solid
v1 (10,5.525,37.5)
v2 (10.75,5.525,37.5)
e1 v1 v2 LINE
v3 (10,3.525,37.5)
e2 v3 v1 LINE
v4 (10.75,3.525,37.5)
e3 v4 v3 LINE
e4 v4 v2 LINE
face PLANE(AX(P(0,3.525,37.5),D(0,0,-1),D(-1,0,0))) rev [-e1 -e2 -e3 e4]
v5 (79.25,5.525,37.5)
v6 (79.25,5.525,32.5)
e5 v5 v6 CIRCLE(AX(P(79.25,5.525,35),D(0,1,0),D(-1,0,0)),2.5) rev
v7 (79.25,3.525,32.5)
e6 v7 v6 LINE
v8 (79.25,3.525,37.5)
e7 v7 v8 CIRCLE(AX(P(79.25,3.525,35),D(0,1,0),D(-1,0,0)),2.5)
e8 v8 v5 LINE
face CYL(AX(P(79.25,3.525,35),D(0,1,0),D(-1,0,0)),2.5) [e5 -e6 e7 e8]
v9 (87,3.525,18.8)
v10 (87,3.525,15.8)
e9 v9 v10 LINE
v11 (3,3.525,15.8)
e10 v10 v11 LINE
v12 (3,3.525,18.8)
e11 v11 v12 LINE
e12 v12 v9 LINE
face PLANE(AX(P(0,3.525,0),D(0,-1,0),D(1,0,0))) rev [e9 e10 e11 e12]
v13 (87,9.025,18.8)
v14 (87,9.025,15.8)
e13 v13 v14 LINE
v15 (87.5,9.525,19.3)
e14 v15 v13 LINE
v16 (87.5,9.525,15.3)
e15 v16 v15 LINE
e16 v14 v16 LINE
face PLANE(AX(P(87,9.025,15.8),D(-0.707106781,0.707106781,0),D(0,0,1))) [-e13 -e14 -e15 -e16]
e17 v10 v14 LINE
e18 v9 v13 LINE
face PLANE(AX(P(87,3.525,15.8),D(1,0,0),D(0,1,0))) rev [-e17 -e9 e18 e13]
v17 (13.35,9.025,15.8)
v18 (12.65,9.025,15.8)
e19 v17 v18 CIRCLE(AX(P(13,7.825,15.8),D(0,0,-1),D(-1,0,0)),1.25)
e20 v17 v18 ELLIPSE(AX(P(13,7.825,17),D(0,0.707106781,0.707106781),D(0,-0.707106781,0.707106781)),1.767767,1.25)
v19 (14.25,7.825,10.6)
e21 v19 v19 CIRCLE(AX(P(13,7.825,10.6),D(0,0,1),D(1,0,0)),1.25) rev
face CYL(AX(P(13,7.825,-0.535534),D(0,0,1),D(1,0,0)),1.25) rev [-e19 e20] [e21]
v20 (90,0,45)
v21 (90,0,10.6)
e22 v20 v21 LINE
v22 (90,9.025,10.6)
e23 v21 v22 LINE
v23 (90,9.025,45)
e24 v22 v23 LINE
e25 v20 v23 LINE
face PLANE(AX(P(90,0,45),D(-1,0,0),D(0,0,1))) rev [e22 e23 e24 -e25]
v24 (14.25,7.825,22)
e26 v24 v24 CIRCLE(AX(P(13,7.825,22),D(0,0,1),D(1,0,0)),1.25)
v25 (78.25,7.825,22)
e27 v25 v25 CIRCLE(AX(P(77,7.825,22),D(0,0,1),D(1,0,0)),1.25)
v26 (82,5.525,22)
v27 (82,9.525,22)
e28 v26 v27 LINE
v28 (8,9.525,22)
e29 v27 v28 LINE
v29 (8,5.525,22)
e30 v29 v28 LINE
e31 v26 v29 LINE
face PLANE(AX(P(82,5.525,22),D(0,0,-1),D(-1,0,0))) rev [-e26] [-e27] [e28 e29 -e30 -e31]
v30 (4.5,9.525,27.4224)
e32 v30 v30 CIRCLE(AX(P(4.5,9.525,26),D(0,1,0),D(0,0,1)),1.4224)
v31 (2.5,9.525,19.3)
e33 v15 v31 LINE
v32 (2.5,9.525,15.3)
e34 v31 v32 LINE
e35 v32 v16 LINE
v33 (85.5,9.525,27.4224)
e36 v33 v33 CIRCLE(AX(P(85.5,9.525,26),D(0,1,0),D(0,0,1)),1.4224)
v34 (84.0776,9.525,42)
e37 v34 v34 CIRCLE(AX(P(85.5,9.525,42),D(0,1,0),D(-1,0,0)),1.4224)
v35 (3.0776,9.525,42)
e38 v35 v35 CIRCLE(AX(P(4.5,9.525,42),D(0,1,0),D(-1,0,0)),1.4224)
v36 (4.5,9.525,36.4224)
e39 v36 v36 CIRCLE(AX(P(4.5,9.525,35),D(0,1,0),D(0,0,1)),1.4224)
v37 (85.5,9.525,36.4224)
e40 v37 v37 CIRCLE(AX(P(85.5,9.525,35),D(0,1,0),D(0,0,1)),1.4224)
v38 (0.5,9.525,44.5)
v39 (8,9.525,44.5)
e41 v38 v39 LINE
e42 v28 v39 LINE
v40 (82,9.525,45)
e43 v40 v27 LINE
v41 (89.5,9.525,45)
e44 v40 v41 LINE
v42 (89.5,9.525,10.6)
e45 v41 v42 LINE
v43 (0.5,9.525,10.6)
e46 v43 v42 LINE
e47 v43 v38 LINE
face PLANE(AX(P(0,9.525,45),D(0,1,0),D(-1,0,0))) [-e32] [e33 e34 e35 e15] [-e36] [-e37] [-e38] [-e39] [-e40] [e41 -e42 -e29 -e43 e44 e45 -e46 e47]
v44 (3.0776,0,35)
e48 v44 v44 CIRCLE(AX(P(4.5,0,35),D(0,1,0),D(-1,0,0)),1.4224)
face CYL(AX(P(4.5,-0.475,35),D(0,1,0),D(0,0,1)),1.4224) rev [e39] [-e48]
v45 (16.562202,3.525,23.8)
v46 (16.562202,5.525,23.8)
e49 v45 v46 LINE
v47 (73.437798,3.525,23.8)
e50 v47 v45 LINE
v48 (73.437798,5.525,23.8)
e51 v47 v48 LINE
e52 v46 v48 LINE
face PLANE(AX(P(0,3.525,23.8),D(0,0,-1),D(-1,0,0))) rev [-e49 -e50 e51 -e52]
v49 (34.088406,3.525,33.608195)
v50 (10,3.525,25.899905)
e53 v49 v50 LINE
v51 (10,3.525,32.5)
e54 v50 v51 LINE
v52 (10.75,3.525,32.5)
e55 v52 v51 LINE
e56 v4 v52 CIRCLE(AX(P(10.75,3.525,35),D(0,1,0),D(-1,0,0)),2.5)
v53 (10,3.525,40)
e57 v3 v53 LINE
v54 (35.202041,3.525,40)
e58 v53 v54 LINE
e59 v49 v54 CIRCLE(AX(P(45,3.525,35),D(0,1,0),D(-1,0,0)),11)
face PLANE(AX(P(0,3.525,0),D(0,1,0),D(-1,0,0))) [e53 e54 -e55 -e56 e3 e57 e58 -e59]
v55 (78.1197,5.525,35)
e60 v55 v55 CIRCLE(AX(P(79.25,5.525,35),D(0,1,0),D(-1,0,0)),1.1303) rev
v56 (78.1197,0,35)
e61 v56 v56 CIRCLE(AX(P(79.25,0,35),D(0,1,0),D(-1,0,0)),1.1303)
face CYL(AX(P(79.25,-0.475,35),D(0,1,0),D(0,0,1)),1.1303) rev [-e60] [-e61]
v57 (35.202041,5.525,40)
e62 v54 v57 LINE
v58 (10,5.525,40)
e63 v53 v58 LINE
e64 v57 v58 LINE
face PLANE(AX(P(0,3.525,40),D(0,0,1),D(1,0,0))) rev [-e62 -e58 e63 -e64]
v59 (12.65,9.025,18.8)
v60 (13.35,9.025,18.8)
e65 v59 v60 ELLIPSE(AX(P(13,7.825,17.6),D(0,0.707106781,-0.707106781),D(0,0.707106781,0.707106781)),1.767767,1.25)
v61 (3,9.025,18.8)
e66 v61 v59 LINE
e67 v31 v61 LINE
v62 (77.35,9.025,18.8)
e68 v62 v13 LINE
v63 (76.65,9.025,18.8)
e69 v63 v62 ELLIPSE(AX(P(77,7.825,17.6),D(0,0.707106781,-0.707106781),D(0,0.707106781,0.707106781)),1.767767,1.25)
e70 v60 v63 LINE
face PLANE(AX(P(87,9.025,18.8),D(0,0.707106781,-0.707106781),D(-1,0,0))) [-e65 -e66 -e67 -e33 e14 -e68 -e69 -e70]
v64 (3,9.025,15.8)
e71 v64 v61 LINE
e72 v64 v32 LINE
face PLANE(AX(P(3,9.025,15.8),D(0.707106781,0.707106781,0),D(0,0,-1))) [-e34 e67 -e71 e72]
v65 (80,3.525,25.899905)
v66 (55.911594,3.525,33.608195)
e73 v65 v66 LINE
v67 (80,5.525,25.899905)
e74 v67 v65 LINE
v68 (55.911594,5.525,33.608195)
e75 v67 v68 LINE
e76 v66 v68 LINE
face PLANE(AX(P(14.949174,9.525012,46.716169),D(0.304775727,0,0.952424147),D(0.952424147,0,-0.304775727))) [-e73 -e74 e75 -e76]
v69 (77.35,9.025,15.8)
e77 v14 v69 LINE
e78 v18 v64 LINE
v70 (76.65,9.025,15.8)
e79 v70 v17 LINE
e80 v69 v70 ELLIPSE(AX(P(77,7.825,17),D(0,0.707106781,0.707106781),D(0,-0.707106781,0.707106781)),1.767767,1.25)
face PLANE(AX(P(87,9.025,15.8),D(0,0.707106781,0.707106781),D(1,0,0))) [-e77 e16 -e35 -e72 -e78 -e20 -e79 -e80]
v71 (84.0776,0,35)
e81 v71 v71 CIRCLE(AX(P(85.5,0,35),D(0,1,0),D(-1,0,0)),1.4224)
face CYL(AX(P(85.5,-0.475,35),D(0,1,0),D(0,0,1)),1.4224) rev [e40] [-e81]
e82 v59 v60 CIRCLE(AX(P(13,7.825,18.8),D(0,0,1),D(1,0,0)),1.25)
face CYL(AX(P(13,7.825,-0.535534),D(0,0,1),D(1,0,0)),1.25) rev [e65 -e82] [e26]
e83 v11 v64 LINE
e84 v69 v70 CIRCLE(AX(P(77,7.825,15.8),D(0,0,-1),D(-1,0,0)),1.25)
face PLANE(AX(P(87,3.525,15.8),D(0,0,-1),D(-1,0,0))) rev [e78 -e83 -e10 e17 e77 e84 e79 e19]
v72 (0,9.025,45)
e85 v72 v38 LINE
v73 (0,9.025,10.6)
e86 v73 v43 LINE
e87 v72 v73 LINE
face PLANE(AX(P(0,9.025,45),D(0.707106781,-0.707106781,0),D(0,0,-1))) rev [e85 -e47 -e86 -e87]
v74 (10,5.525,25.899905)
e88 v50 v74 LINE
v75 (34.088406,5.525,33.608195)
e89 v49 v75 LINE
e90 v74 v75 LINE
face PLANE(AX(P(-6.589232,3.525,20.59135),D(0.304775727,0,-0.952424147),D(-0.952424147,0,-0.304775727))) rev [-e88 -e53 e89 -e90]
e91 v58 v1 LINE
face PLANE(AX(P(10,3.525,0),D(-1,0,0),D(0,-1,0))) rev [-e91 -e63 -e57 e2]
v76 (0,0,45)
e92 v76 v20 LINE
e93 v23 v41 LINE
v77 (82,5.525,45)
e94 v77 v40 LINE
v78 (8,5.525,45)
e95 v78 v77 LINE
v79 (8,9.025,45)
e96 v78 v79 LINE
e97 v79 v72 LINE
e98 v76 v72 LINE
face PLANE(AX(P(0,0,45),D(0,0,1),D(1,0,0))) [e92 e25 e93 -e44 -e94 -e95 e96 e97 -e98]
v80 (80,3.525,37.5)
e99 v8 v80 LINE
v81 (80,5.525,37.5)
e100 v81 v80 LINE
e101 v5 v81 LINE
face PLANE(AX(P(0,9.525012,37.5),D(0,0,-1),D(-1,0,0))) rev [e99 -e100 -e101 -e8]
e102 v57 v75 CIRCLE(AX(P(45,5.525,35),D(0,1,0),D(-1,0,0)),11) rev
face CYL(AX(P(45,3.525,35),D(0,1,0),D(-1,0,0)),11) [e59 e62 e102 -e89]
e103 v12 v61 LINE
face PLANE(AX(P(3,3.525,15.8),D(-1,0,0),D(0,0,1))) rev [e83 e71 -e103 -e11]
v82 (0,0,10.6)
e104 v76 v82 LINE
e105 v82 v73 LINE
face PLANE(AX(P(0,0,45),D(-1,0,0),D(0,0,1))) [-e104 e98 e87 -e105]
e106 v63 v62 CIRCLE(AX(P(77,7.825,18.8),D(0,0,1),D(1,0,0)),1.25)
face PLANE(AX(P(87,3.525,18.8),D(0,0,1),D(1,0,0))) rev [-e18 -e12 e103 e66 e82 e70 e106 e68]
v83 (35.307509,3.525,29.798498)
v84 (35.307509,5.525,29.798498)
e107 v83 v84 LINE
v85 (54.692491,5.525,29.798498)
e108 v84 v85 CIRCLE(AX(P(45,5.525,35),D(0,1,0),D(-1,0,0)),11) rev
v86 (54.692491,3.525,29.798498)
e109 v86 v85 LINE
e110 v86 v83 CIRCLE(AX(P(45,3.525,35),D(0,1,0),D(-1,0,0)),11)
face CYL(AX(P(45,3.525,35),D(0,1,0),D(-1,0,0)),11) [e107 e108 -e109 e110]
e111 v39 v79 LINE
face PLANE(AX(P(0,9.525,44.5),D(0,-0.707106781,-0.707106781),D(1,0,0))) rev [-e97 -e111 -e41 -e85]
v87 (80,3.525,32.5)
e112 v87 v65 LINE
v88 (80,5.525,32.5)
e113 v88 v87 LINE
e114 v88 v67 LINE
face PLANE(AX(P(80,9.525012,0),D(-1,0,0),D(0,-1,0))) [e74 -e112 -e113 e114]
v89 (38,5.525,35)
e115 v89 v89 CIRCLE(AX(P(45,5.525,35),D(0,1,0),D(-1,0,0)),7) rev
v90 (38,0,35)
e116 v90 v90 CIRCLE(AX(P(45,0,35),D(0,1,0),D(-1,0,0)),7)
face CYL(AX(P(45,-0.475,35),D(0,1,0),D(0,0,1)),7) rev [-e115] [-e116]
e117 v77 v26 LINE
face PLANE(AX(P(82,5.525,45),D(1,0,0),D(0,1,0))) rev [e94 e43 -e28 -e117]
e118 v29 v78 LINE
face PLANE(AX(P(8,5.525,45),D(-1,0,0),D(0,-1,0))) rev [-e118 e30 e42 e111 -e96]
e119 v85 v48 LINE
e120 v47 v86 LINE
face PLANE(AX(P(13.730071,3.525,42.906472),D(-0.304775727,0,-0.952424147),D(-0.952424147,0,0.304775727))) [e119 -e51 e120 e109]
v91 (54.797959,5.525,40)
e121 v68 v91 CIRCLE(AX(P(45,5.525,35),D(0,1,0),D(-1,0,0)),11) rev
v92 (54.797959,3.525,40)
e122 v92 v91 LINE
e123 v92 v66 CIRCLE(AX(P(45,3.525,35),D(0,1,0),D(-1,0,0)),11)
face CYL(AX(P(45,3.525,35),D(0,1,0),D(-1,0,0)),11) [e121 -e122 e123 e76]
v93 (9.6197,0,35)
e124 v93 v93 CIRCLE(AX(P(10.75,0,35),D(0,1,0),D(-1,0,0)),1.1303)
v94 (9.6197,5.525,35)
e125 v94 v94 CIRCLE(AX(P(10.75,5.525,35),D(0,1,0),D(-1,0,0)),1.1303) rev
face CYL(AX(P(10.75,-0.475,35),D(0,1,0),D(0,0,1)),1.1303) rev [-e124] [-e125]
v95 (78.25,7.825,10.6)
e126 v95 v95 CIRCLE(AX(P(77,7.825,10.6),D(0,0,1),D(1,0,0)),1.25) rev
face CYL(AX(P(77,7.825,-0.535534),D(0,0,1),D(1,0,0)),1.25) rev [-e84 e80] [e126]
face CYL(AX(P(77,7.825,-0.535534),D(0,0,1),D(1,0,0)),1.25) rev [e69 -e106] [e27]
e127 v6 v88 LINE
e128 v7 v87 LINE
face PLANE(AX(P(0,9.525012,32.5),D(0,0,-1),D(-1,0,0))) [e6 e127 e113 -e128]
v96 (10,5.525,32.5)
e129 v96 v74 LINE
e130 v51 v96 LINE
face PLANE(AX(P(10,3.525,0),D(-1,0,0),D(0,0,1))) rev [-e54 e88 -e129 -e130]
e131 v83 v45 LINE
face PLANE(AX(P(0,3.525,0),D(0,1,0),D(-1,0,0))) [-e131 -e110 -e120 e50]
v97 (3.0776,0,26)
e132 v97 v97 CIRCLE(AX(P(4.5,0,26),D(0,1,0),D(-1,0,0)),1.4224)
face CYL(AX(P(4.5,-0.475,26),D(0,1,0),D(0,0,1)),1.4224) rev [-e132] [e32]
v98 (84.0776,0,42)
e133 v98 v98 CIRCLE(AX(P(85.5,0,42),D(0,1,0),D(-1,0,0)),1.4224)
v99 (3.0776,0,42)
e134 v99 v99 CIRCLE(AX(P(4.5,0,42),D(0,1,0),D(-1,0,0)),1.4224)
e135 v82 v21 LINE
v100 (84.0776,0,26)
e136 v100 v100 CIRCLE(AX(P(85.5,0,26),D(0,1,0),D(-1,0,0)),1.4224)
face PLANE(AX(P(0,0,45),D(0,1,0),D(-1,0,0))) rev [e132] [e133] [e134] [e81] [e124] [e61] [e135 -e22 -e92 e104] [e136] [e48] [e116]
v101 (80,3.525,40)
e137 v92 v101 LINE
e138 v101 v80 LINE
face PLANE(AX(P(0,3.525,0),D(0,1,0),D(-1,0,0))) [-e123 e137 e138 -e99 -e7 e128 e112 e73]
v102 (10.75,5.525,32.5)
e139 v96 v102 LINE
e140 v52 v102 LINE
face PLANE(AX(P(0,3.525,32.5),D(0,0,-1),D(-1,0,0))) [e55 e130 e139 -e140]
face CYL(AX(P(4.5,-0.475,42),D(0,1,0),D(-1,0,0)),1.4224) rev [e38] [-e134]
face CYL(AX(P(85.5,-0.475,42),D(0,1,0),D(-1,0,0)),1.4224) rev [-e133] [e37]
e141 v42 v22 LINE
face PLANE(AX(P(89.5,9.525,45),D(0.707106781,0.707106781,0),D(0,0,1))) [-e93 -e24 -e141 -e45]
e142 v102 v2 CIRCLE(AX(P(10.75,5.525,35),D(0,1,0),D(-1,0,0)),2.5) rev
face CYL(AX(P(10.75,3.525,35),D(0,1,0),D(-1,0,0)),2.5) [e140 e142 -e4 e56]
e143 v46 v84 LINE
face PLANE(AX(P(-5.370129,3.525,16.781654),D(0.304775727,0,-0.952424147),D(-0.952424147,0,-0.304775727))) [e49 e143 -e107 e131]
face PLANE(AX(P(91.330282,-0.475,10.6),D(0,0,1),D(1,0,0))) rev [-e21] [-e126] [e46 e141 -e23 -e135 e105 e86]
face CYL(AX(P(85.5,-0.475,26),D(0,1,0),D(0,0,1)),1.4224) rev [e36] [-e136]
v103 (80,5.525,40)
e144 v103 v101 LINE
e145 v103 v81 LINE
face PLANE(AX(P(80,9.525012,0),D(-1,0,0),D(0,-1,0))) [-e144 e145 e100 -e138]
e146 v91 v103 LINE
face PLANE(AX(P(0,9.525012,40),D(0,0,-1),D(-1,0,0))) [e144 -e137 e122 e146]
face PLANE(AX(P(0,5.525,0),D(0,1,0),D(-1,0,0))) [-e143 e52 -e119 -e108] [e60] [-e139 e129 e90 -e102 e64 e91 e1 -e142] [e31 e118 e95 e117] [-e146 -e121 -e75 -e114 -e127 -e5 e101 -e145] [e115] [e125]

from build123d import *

# Parameters (mm, degrees)
SKETCH1_W               = 90
SKETCH1_H               = 9.525
SKETCH1_R               = 2
BOSS_EXTRUDE1_DEPTH     = 45
SKETCH2_R               = 7
CUT_EXTRUDE2_DEPTH      = 10
SKETCH3_R               = 1.4224
SKETCH3_R_2             = 7
SKETCH3_R_3             = 1.1303
CUT_EXTRUDE3_DEPTH      = 10
SKETCH4_W               = 84
SKETCH4_H               = 3
CUT_EXTRUDE4_DEPTH      = 6
CUT_EXTRUDE6_DEPTH      = 102.072872844
CUT_EXTRUDE6_DEPTH_BACK = 6
SKETCH7_W               = 90
SKETCH7_H               = 3
CUT_EXTRUDE7_DEPTH      = 10
SKETCH9_W               = 74
SKETCH9_H               = 23
CUT_EXTRUDE8_DEPTH      = 4
CUT_EXTRUDE9_REACH      = 95.379
SKETCH10_R              = 1.25
CHAMFER2_SIZE           = 0.5
SKETCH11_R              = 1.4224
CUT_EXTRUDE10_DEPTH     = 10
SKETCH12_W              = 100.09511362
SKETCH12_H              = 20.870657589
CUT_EXTRUDE11_DEPTH     = 10


with BuildPart() as part:
    # Sketch1 → Boss-Extrude1 (new body)
    # profile 1 of 3: a face of its own
    with BuildSketch(Plane.XY):
        with Locations((45, 4.7625)):
            Rectangle(SKETCH1_W, SKETCH1_H)
        with Locations((60, 4.7625)):
            Circle(SKETCH1_R, mode=Mode.SUBTRACT)
        with Locations((30, 4.7625)):
            Circle(SKETCH1_R, mode=Mode.SUBTRACT)
    # profile 2 of 3: a face of its own
    with BuildSketch(Plane.XY):
        with Locations((30, 4.7625)):
            Circle(SKETCH1_R)
    # profile 3 of 3: a face of its own
    with BuildSketch(Plane.XY):
        with Locations((60, 4.7625)):
            Circle(SKETCH1_R)
    extrude(amount=BOSS_EXTRUDE1_DEPTH)

    # Sketch2 → Cut-Extrude2 (cut)
    with BuildSketch(Plane(origin=(0, 9.525, 0), x_dir=(1, 0, 0), z_dir=(0, 1, 0))):
        with Locations(Location((45, -35, 0), (0, 0, 270))):
            Circle(SKETCH2_R)
    extrude(amount=-CUT_EXTRUDE2_DEPTH, mode=Mode.SUBTRACT)

    # Sketch3 → Cut-Extrude3 (cut)
    with BuildSketch(Plane(origin=(0, 9.525, 0), x_dir=(1, 0, 0), z_dir=(0, 1, 0))):
        with Locations(Location((85.5, -35, 0), (0, 0, 270))):
            Circle(SKETCH3_R)
        with Locations(Location((4.5, -35, 0), (0, 0, 270))):
            Circle(SKETCH3_R)
        with Locations(Location((45, -35, 0), (0, 0, 270))):
            Circle(SKETCH3_R_2)
        with Locations(Location((85.5, -26, 0), (0, 0, 270))):
            Circle(SKETCH3_R)
        with Locations(Location((4.5, -26, 0), (0, 0, 270))):
            Circle(SKETCH3_R)
        with Locations(Location((79.25, -35, 0), (0, 0, 270))):
            Circle(SKETCH3_R_3)
        with Locations(Location((10.75, -35, 0), (0, 0, 270))):
            Circle(SKETCH3_R_3)
    extrude(amount=-CUT_EXTRUDE3_DEPTH, mode=Mode.SUBTRACT)

    # Sketch4 → Cut-Extrude4 (cut)
    with BuildSketch(Plane(origin=(0, 9.525, 0), x_dir=(1, 0, 0), z_dir=(0, 1, 0))):
        with Locations((45, -17.3)):
            Rectangle(SKETCH4_W, SKETCH4_H)
    extrude(amount=-CUT_EXTRUDE4_DEPTH, mode=Mode.SUBTRACT)

    # Sketch6 → Cut-Extrude6 (cut, two sides: drawn at the far end of the back side and taken through both)
    with BuildSketch(Plane(origin=(0, 9.525, 0), x_dir=(1, 0, 0), z_dir=(0, 1, 0)).offset(-CUT_EXTRUDE6_DEPTH_BACK)):
        with BuildLine():
            ThreePointArc((10.75, -32.5), (13.25, -35), (10.75, -37.5))
            Line((10.75, -37.5), (10, -37.5))
            Line((10, -37.5), (10, -40))
            Line((10, -40), (35.202041029, -40))
            ThreePointArc((35.202041029, -40), (34.163248317, -36.888071228), (34.08840625, -33.60819476))
            Line((34.08840625, -33.60819476), (10, -25.89990476))
            Line((10, -25.89990476), (10, -32.5))
            Line((10, -32.5), (10.75, -32.5))
        make_face()
        with BuildLine():
            Line((16.562202374, -23.8), (35.307509158, -29.798498171))
            ThreePointArc((35.307509158, -29.798498171), (45, -24), (54.692490842, -29.798498171))
            Line((54.692490842, -29.798498171), (73.437797626, -23.8))
            Line((73.437797626, -23.8), (16.562202374, -23.8))
        make_face()
        with BuildLine():
            ThreePointArc((55.91159375, -33.60819476), (55.836751683, -36.888071228), (54.797958971, -40))
            Line((54.797958971, -40), (80, -40))
            Line((80, -40), (80, -37.5))
            Line((80, -37.5), (79.25, -37.5))
            ThreePointArc((79.25, -37.5), (76.75, -35), (79.25, -32.5))
            Line((79.25, -32.5), (80, -32.5))
            Line((80, -32.5), (80, -25.89990476))
            Line((80, -25.89990476), (55.91159375, -33.60819476))
        make_face()
    extrude(amount=CUT_EXTRUDE6_DEPTH + CUT_EXTRUDE6_DEPTH_BACK, mode=Mode.SUBTRACT)

    # Sketch7 → Cut-Extrude7 (cut)
    with BuildSketch(Plane(origin=(0, 9.525, 0), x_dir=(1, 0, 0), z_dir=(0, 1, 0))):
        with Locations((45, -1.5)):
            Rectangle(SKETCH7_W, SKETCH7_H)
    extrude(amount=-CUT_EXTRUDE7_DEPTH, mode=Mode.SUBTRACT)

    # Sketch9 → Cut-Extrude8 (cut)
    with BuildSketch(Plane(origin=(0, 9.525, 0), x_dir=(1, 0, 0), z_dir=(0, 1, 0))):
        with Locations((45, -33.5)):
            Rectangle(SKETCH9_W, SKETCH9_H)
    extrude(amount=-CUT_EXTRUDE8_DEPTH, mode=Mode.SUBTRACT)

    # Cut-Extrude9: up to this face of the body (flat: up to its plane)
    cut_extrude9_end = Plane(part.part.faces().sort_by_distance((45, 4.7625, 3))[0])
    # Sketch10 → Cut-Extrude9 (cut, up to the picked face)
    with BuildSketch(Plane.XY.offset(22), mode=Mode.PRIVATE) as cut_extrude9_sk1:
        with Locations((77, 7.825)):
            Circle(SKETCH10_R)
    cut_extrude9_tool1 = split(extrude(cut_extrude9_sk1.sketch, amount=-CUT_EXTRUDE9_REACH, mode=Mode.PRIVATE), bisect_by=cut_extrude9_end, keep=Keep.BOTH, mode=Mode.PRIVATE)
    # Sketch10 → Cut-Extrude9 (cut, up to the picked face)
    with BuildSketch(Plane.XY.offset(22), mode=Mode.PRIVATE) as cut_extrude9_sk2:
        with Locations((13, 7.825)):
            Circle(SKETCH10_R)
    cut_extrude9_tool2 = split(extrude(cut_extrude9_sk2.sketch, amount=-CUT_EXTRUDE9_REACH, mode=Mode.PRIVATE), bisect_by=cut_extrude9_end, keep=Keep.BOTH, mode=Mode.PRIVATE)
    add(cut_extrude9_tool1.solids().sort_by(Axis((77, 7.825, 22), (0, 0, -1)))[0], mode=Mode.SUBTRACT)
    add(cut_extrude9_tool2.solids().sort_by(Axis((13, 7.825, 22), (0, 0, -1)))[0], mode=Mode.SUBTRACT)

    # Chamfer2
    # the kernel refuses this chamfer: 0.5 mm, written as the material it takes off along each edge
    with BuildSketch(Plane(origin=(9.285841494, 9.525, 45), x_dir=(0, -0.999621916911297, 0.0274958766105822), z_dir=(-1, 0, 0))) as chamfer2_piece_1:
        Polygon((CHAMFER2_SIZE * 0.999621916911, -CHAMFER2_SIZE * 0.0274958766106), (-CHAMFER2_SIZE * 0.0274958766106, -CHAMFER2_SIZE * 0.999621916911), (0, 0), align=None)
    extrude(amount=10.571682988, mode=Mode.SUBTRACT)
    with BuildSketch(Plane(origin=(-1.285841494, 9.525, 3), x_dir=(0, -0.9996219169112968, -0.02749587661058651), z_dir=(1, 0, 0))) as chamfer2_piece_2:
        Polygon((CHAMFER2_SIZE * 0.999621916911, -CHAMFER2_SIZE * 0.0274958766106), (-CHAMFER2_SIZE * 0.0274958766106, -CHAMFER2_SIZE * 0.999621916911), (0, 0), align=None)
    extrude(amount=92.571682988, mode=Mode.SUBTRACT)
    with BuildSketch(Plane(origin=(87, 9.525, 18.8), x_dir=(0.999621916911297, 0.027495876610582292, 0), z_dir=(0, 0, -1)), Plane(origin=(3, 9.525, 15.8), x_dir=(-0.9996219169112968, 0.027495876610585408, -1.035816383536533e-15), z_dir=(0, 0, 1))) as chamfer2_piece_3:
        Polygon((CHAMFER2_SIZE * 0.999621916911, CHAMFER2_SIZE * 0.0274958766106), (-CHAMFER2_SIZE * 0.0274958766106, CHAMFER2_SIZE * 0.999621916911), (0, 0), align=None)
    extrude(amount=3, mode=Mode.SUBTRACT)
    with BuildSketch(Plane(origin=(87, 9.525, 15.8), x_dir=(0, 0.0274958766105822, -0.999621916911297), z_dir=(-1, 0, 0)), Plane(origin=(3, 9.525, 18.8), x_dir=(0, 0.02749587661058555, 0.9996219169112968), z_dir=(1, 0, 0))) as chamfer2_piece_4:
        Polygon((CHAMFER2_SIZE * 0.999621916911, CHAMFER2_SIZE * 0.0274958766106), (-CHAMFER2_SIZE * 0.0274958766106, CHAMFER2_SIZE * 0.999621916911), (0, 0), align=None)
    extrude(amount=84, mode=Mode.SUBTRACT)
    with BuildSketch(Plane(origin=(0, 9.525, 1.714158506), x_dir=(-0.02749587661058639, -0.9996219169112968, 0), z_dir=(0, 0, 1))) as chamfer2_piece_5:
        Polygon((CHAMFER2_SIZE * 0.999621916911, CHAMFER2_SIZE * 0.0274958766106), (-CHAMFER2_SIZE * 0.0274958766106, CHAMFER2_SIZE * 0.999621916911), (0, 0), align=None)
    extrude(amount=44.571682988, mode=Mode.SUBTRACT)
    with BuildSketch(Plane(origin=(90, 9.525, 1.714158506), x_dir=(0.0274958766105822, -0.999621916911297, 0), z_dir=(0, 0, 1))) as chamfer2_piece_6:
        Polygon((CHAMFER2_SIZE * 0.999621916911, -CHAMFER2_SIZE * 0.0274958766106), (-CHAMFER2_SIZE * 0.0274958766106, -CHAMFER2_SIZE * 0.999621916911), (0, 0), align=None)
    extrude(amount=44.571682988, mode=Mode.SUBTRACT)
    with BuildSketch(Plane(origin=(87, 9.525, 20.085841494), x_dir=(0.9996219169112968, 0.02749587661058574, 0), z_dir=(0, 0, -1))) as chamfer2_piece_7a_section:
        Polygon((CHAMFER2_SIZE * 0.999621916911, CHAMFER2_SIZE * 0.0274958766106), (-CHAMFER2_SIZE * 0.0274958766106, CHAMFER2_SIZE * 0.999621916911), (0, 0), align=None)
    chamfer2_piece_7a = extrude(amount=4.285841494, mode=Mode.PRIVATE)
    chamfer2_piece_7a = split(chamfer2_piece_7a, bisect_by=Plane(origin=(87.164896813, 9.360103187, 18.8), z_dir=(0, 0, 1)), keep=Keep.TOP, mode=Mode.PRIVATE)
    with BuildSketch(Plane(origin=(3, 9.525, 18.8), x_dir=(0, 0.02749587661058555, 0.9996219169112968), z_dir=(1, 0, 0))) as chamfer2_piece_7b_section:
        Polygon((CHAMFER2_SIZE * 0.999621916911, CHAMFER2_SIZE * 0.0274958766106), (-CHAMFER2_SIZE * 0.0274958766106, CHAMFER2_SIZE * 0.999621916911), (0, 0), align=None)
    chamfer2_piece_7b = extrude(amount=85.285841494, mode=Mode.PRIVATE)
    chamfer2_piece_7b = split(chamfer2_piece_7b, bisect_by=Plane(origin=(87, 9.360103187, 18.964896813), z_dir=(1, 0, 0)), keep=Keep.TOP, mode=Mode.PRIVATE)
    chamfer2_piece_7 = chamfer2_piece_7a & chamfer2_piece_7b
    add(chamfer2_piece_7, mode=Mode.SUBTRACT)
    with BuildSketch(Plane(origin=(87, 9.525, 18.8), x_dir=(0.999621916911297, 0.027495876610582292, 0), z_dir=(0, 0, -1))) as chamfer2_piece_8a_section:
        Polygon((CHAMFER2_SIZE * 0.999621916911, CHAMFER2_SIZE * 0.0274958766106), (-CHAMFER2_SIZE * 0.0274958766106, CHAMFER2_SIZE * 0.999621916911), (0, 0), align=None)
    chamfer2_piece_8a = extrude(amount=4.285841494, mode=Mode.PRIVATE)
    chamfer2_piece_8a = split(chamfer2_piece_8a, bisect_by=Plane(origin=(87.164896813, 9.360103187, 15.8), z_dir=(0, 0, -1)), keep=Keep.TOP, mode=Mode.PRIVATE)
    with BuildSketch(Plane(origin=(88.285841494, 9.525, 15.8), x_dir=(0, 0.027495876610585647, -0.9996219169112968), z_dir=(-1, 0, 0))) as chamfer2_piece_8b_section:
        Polygon((CHAMFER2_SIZE * 0.999621916911, CHAMFER2_SIZE * 0.0274958766106), (-CHAMFER2_SIZE * 0.0274958766106, CHAMFER2_SIZE * 0.999621916911), (0, 0), align=None)
    chamfer2_piece_8b = extrude(amount=85.285841494, mode=Mode.PRIVATE)
    chamfer2_piece_8b = split(chamfer2_piece_8b, bisect_by=Plane(origin=(87, 9.360103187, 15.635103187), z_dir=(1, 0, 0)), keep=Keep.TOP, mode=Mode.PRIVATE)
    chamfer2_piece_8 = chamfer2_piece_8a & chamfer2_piece_8b
    add(chamfer2_piece_8, mode=Mode.SUBTRACT)
    with BuildSketch(Plane(origin=(87, 9.525, 15.8), x_dir=(0, 0.0274958766105822, -0.999621916911297), z_dir=(-1, 0, 0))) as chamfer2_piece_9a_section:
        Polygon((CHAMFER2_SIZE * 0.999621916911, CHAMFER2_SIZE * 0.0274958766106), (-CHAMFER2_SIZE * 0.0274958766106, CHAMFER2_SIZE * 0.999621916911), (0, 0), align=None)
    chamfer2_piece_9a = extrude(amount=85.285841494, mode=Mode.PRIVATE)
    chamfer2_piece_9a = split(chamfer2_piece_9a, bisect_by=Plane(origin=(3, 9.360103187, 15.635103187), z_dir=(-1, 0, 0)), keep=Keep.TOP, mode=Mode.PRIVATE)
    with BuildSketch(Plane(origin=(3, 9.525, 14.514158506), x_dir=(-0.9996219169112968, 0.027495876610585623, -1.035816383536533e-15), z_dir=(0, 0, 1))) as chamfer2_piece_9b_section:
        Polygon((CHAMFER2_SIZE * 0.999621916911, CHAMFER2_SIZE * 0.0274958766106), (-CHAMFER2_SIZE * 0.0274958766106, CHAMFER2_SIZE * 0.999621916911), (0, 0), align=None)
    chamfer2_piece_9b = extrude(amount=4.285841494, mode=Mode.PRIVATE)
    chamfer2_piece_9b = split(chamfer2_piece_9b, bisect_by=Plane(origin=(2.835103187, 9.360103187, 15.8), z_dir=(0, 0, -1)), keep=Keep.TOP, mode=Mode.PRIVATE)
    chamfer2_piece_9 = chamfer2_piece_9a & chamfer2_piece_9b
    add(chamfer2_piece_9, mode=Mode.SUBTRACT)
    with BuildSketch(Plane(origin=(1.714158506, 9.525, 18.8), x_dir=(0, 0.02749587661058555, 0.9996219169112968), z_dir=(1, 0, 0))) as chamfer2_piece_10a_section:
        Polygon((CHAMFER2_SIZE * 0.999621916911, CHAMFER2_SIZE * 0.0274958766106), (-CHAMFER2_SIZE * 0.0274958766106, CHAMFER2_SIZE * 0.999621916911), (0, 0), align=None)
    chamfer2_piece_10a = extrude(amount=85.285841494, mode=Mode.PRIVATE)
    chamfer2_piece_10a = split(chamfer2_piece_10a, bisect_by=Plane(origin=(3, 9.360103187, 18.964896813), z_dir=(-1, 0, 0)), keep=Keep.TOP, mode=Mode.PRIVATE)
    with BuildSketch(Plane(origin=(3, 9.525, 15.8), x_dir=(-0.9996219169112968, 0.027495876610585408, -1.035816383536533e-15), z_dir=(0, 0, 1))) as chamfer2_piece_10b_section:
        Polygon((CHAMFER2_SIZE * 0.999621916911, CHAMFER2_SIZE * 0.0274958766106), (-CHAMFER2_SIZE * 0.0274958766106, CHAMFER2_SIZE * 0.999621916911), (0, 0), align=None)
    chamfer2_piece_10b = extrude(amount=4.285841494, mode=Mode.PRIVATE)
    chamfer2_piece_10b = split(chamfer2_piece_10b, bisect_by=Plane(origin=(2.835103187, 9.360103187, 18.8), z_dir=(0, 0, 1)), keep=Keep.TOP, mode=Mode.PRIVATE)
    chamfer2_piece_10 = chamfer2_piece_10a & chamfer2_piece_10b
    add(chamfer2_piece_10, mode=Mode.SUBTRACT)

    # Sketch11 → Cut-Extrude10 (cut)
    with BuildSketch(Plane(origin=(0, 9.525, 0), x_dir=(1, 0, 0), z_dir=(0, 1, 0))):
        with Locations(Location((85.5, -42, 0), (0, 0, 180))):
            Circle(SKETCH11_R)
        with Locations(Location((4.5, -42, 0), (0, 0, 180))):
            Circle(SKETCH11_R)
    extrude(amount=-CUT_EXTRUDE10_DEPTH, mode=Mode.SUBTRACT)

    # Sketch12 → Cut-Extrude11 (cut)
    with BuildSketch(Plane(origin=(0, 9.525, 0), x_dir=(1, 0, 0), z_dir=(0, 1, 0))):
        with Locations((41.282725073, -0.164671206)):
            Rectangle(SKETCH12_W, SKETCH12_H)
    extrude(amount=-CUT_EXTRUDE11_DEPTH, mode=Mode.SUBTRACT)


solid = part.part
